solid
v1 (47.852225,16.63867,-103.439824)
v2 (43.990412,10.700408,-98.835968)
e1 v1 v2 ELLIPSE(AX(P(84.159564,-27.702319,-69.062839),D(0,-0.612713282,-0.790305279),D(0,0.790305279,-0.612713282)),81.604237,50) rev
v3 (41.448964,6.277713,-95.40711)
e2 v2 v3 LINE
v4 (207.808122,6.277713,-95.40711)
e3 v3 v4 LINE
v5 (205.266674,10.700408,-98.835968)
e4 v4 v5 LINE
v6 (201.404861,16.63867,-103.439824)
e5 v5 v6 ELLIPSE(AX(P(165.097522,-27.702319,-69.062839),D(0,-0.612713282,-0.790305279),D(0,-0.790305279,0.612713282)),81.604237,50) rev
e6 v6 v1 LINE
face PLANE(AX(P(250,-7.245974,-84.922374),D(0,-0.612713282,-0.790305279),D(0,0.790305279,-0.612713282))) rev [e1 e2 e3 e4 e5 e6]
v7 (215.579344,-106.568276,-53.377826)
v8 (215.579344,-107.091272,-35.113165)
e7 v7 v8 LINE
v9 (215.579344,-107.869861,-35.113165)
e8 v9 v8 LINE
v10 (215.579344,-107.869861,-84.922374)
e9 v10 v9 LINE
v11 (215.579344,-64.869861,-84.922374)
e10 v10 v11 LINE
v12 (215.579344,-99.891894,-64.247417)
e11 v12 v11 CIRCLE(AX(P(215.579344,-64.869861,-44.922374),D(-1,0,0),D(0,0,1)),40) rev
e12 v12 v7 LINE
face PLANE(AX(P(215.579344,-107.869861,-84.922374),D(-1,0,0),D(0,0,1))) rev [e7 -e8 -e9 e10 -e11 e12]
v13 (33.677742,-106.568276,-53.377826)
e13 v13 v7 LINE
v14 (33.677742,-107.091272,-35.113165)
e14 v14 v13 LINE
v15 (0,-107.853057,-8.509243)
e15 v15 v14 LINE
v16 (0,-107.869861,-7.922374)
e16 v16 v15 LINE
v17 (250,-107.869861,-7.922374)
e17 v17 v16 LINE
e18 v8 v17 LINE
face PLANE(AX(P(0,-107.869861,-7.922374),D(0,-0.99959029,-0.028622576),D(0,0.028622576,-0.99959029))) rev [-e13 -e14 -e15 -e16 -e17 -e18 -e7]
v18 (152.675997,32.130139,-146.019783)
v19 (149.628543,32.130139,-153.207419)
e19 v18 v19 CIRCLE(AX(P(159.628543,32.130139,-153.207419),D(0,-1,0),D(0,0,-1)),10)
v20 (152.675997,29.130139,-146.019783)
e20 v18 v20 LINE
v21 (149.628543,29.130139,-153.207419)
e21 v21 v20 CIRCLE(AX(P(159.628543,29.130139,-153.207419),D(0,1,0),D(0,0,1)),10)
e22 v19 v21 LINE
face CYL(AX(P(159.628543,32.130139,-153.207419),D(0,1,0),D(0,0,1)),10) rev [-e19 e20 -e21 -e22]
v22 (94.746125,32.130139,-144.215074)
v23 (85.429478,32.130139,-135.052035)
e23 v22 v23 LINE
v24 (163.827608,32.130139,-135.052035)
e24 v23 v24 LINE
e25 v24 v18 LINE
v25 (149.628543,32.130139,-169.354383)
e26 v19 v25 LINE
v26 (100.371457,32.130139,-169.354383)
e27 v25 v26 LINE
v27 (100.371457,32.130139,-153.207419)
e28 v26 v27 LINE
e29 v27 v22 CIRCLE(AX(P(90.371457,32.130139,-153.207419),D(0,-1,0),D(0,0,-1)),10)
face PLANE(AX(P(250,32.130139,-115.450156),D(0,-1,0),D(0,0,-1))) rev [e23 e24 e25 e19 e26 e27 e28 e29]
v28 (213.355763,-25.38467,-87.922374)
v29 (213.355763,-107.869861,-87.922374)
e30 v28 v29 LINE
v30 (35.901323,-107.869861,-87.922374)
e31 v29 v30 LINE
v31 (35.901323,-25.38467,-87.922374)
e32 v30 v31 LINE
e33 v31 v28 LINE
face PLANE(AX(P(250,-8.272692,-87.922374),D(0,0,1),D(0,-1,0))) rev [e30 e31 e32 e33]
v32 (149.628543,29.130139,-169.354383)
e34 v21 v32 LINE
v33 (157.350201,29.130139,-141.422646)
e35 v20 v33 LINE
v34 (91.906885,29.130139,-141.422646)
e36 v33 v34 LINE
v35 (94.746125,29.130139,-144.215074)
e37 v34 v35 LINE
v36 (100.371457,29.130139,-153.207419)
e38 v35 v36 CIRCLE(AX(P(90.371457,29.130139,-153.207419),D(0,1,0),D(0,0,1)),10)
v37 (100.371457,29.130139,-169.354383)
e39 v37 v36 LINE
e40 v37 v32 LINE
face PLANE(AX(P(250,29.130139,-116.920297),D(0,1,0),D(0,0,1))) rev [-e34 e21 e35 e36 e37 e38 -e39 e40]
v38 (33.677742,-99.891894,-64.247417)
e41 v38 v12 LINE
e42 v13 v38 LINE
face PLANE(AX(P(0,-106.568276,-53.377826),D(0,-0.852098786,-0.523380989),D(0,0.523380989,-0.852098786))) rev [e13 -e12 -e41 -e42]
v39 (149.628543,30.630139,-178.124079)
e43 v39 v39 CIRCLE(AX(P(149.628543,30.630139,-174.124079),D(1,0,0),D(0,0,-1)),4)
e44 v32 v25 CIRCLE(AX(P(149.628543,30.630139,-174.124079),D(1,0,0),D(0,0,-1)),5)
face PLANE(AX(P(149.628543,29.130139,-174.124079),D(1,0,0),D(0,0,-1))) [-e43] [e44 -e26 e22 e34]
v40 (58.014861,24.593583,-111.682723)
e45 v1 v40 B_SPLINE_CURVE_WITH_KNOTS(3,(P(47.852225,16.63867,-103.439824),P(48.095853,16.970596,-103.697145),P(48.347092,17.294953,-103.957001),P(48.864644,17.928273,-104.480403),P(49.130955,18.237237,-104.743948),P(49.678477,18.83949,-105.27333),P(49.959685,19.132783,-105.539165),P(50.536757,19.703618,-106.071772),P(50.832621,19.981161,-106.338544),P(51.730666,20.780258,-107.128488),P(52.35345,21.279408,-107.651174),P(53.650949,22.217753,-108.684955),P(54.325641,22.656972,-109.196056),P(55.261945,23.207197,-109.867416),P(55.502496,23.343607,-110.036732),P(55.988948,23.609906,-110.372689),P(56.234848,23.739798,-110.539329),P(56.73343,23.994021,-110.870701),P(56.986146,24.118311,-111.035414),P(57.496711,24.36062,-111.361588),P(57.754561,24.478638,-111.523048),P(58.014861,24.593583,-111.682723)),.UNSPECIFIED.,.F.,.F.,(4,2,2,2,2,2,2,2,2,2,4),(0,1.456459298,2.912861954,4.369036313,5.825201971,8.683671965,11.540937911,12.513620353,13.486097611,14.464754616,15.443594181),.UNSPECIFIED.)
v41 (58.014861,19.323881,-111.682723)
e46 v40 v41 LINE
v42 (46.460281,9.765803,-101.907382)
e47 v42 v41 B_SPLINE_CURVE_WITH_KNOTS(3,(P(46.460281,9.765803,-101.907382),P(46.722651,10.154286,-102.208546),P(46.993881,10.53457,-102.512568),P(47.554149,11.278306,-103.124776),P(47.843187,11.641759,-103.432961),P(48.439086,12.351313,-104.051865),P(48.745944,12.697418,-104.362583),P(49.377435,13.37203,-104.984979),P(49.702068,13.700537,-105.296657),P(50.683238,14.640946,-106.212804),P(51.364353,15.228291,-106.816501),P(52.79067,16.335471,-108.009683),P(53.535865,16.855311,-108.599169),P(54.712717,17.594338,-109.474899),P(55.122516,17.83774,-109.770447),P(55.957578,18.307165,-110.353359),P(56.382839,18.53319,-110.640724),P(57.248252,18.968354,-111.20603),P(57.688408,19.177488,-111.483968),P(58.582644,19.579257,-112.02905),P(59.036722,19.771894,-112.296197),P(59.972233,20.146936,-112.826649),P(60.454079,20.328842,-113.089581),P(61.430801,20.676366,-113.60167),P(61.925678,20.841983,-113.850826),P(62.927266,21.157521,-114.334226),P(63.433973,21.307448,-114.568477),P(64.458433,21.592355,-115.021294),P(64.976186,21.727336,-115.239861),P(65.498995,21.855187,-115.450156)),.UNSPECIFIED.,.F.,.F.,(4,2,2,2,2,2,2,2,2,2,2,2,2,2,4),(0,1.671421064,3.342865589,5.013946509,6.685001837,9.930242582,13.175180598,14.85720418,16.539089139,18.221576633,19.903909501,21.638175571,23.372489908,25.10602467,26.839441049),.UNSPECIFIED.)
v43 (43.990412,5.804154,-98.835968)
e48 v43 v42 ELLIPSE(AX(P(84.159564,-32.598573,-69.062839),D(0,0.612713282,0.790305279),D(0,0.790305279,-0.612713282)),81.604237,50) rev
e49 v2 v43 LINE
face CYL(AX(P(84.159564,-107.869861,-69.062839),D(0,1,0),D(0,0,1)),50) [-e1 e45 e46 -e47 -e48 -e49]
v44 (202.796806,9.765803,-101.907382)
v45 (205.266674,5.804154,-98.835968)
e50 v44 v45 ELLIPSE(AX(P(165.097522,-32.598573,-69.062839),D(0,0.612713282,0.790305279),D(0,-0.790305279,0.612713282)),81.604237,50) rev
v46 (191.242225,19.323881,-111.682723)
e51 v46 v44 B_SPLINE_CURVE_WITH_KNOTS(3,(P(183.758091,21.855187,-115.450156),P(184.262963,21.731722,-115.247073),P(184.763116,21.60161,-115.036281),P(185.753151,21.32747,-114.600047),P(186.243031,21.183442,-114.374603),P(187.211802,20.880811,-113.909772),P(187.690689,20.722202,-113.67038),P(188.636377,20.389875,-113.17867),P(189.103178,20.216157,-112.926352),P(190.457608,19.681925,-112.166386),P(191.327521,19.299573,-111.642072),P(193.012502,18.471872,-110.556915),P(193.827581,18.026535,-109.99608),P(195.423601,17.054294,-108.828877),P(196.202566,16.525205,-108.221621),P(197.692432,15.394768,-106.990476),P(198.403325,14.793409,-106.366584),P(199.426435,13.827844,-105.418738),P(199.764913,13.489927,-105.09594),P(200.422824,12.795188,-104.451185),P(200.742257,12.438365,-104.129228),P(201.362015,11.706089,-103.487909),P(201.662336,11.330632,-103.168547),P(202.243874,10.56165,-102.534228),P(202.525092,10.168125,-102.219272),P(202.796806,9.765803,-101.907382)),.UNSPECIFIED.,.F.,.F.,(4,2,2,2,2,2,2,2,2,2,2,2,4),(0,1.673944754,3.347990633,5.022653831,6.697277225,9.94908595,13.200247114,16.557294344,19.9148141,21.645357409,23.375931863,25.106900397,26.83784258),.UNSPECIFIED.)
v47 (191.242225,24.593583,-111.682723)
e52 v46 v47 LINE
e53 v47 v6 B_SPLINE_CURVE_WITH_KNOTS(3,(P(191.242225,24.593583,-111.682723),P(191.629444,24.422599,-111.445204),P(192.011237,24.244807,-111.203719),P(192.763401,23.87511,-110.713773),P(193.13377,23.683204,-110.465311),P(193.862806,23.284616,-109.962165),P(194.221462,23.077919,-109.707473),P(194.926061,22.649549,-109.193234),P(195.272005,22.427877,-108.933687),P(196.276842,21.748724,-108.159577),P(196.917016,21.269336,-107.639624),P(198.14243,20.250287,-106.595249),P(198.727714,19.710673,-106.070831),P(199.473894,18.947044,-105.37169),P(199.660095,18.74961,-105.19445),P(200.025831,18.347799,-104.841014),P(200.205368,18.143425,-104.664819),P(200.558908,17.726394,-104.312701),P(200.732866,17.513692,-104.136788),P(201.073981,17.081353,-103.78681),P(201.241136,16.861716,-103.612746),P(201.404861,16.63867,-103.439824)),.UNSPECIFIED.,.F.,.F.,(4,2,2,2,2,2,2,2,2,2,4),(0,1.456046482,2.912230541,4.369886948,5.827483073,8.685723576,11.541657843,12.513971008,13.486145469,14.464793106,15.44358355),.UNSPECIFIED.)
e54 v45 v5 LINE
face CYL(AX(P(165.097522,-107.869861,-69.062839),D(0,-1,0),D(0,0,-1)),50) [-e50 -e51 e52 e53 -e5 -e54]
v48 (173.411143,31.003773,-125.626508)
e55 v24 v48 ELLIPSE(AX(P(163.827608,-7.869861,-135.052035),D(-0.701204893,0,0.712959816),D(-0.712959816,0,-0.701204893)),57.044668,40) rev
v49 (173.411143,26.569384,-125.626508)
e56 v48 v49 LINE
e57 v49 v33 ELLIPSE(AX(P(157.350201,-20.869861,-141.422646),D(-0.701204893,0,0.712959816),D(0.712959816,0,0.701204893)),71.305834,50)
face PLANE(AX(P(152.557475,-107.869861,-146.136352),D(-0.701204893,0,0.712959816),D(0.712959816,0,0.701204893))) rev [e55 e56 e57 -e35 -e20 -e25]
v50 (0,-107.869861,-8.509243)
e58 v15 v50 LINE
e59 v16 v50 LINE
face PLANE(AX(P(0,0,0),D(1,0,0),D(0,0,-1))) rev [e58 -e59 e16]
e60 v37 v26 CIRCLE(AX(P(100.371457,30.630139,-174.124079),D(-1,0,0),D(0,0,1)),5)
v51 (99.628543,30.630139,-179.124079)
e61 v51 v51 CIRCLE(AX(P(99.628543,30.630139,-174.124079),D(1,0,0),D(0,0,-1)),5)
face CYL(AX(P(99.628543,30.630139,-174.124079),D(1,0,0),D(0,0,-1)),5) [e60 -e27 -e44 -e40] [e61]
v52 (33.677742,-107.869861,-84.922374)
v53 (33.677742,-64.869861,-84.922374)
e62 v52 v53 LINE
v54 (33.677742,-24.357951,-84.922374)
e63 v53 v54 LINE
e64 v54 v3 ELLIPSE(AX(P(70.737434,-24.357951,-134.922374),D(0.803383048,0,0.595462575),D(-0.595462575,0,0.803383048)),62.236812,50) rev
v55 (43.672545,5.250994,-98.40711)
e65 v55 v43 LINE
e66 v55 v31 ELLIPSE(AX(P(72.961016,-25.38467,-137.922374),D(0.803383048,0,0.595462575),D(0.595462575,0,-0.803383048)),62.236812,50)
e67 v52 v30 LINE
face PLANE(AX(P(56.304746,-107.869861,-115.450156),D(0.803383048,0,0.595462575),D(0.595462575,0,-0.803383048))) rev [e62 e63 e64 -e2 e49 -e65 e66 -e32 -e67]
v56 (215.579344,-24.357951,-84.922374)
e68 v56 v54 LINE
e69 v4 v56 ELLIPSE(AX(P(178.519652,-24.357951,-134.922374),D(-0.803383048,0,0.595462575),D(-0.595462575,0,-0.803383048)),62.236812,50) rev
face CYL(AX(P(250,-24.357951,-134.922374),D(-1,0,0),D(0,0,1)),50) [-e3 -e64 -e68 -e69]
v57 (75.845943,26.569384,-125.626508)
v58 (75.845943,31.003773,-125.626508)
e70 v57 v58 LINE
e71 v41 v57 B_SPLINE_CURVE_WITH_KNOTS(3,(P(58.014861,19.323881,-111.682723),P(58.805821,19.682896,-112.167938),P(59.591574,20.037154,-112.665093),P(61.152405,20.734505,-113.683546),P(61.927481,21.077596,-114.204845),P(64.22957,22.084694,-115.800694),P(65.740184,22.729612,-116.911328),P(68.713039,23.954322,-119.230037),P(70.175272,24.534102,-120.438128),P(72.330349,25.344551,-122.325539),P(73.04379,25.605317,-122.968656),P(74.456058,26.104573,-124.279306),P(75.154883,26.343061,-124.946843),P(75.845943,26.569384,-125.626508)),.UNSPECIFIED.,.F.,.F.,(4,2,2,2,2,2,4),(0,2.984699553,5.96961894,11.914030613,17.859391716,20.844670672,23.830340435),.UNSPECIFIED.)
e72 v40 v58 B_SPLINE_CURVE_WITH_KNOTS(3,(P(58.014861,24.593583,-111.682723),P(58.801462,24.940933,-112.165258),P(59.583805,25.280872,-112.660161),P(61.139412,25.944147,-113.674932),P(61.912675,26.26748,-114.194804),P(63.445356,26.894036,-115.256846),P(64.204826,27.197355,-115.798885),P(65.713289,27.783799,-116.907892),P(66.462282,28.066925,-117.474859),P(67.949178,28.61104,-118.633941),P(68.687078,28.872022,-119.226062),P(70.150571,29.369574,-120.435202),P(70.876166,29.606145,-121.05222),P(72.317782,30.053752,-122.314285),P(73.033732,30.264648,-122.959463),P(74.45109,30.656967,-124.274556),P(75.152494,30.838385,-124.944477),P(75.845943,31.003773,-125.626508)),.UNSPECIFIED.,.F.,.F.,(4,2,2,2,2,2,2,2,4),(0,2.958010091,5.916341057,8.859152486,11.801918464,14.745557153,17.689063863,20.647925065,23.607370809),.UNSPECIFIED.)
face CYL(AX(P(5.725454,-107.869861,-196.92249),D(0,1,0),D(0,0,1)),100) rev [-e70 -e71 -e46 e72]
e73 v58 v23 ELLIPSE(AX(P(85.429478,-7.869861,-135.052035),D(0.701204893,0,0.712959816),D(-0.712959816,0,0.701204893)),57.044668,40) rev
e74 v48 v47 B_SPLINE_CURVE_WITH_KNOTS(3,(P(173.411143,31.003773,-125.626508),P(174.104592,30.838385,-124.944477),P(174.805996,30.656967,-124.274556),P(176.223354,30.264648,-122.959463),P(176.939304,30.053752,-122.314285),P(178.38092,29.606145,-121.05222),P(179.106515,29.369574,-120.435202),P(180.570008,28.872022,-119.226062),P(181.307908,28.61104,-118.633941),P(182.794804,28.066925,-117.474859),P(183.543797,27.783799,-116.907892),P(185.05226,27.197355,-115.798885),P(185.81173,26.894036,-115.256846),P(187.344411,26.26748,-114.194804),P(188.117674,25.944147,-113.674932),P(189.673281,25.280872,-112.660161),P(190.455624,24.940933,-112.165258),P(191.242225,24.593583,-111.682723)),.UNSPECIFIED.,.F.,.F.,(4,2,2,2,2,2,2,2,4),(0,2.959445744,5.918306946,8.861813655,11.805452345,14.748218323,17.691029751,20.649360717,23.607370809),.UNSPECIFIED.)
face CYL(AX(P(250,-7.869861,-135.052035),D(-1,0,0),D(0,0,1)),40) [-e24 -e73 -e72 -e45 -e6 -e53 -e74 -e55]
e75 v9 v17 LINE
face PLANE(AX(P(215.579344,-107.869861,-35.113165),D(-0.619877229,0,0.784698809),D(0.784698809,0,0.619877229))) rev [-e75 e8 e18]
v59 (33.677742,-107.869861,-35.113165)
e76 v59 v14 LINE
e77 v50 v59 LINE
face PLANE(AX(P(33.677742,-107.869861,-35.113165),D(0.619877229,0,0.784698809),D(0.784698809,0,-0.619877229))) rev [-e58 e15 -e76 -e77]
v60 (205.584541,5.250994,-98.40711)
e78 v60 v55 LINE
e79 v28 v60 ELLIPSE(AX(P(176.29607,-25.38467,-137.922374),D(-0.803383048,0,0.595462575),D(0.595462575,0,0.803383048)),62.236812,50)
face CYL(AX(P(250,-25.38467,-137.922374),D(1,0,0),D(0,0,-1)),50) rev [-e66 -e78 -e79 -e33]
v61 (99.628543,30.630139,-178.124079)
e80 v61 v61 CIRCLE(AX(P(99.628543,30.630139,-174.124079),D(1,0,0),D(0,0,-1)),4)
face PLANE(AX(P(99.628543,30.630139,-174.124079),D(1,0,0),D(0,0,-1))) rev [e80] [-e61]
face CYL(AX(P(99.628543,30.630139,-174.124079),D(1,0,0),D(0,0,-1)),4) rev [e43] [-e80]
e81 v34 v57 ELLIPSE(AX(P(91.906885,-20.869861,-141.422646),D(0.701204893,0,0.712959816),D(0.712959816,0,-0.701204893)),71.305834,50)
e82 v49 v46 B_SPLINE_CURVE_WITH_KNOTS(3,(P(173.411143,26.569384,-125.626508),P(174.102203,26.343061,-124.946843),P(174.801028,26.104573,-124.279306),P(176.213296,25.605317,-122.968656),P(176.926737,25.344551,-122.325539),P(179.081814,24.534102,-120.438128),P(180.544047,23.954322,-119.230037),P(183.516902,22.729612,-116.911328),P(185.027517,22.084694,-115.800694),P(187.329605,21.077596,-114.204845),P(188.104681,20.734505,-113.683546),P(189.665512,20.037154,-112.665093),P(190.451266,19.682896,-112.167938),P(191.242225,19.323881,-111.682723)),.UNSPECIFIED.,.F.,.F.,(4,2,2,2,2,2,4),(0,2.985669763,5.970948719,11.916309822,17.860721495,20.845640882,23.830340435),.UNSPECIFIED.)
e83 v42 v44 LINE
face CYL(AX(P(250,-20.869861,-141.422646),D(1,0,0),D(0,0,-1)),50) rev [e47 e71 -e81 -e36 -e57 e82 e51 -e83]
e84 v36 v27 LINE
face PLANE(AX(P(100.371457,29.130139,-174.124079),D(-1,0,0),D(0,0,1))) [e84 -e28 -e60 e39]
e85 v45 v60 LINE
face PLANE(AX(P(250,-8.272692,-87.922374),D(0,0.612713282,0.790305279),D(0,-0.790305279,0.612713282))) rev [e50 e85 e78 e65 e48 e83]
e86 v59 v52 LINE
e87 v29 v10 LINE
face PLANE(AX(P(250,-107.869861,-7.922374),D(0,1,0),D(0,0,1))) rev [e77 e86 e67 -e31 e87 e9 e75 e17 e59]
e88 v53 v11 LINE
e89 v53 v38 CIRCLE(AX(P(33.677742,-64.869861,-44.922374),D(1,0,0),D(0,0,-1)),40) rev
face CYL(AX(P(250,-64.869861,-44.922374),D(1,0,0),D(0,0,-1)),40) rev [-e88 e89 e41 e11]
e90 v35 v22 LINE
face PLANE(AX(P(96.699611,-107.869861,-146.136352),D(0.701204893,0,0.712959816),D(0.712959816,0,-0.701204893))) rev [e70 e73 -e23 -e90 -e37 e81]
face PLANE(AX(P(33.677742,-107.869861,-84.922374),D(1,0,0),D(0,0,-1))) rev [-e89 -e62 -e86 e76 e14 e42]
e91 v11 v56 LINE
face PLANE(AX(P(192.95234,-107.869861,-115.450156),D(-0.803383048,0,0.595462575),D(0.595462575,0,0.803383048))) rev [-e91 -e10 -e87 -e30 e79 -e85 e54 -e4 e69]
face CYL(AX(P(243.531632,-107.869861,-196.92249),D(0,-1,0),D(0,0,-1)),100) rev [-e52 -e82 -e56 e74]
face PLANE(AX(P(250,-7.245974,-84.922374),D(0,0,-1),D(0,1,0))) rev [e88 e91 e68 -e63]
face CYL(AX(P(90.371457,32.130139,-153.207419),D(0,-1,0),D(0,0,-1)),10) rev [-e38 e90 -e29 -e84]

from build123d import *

# Parameters (mm, degrees)
BOSS_EXTRUDE1_DEPTH     = 250
FILLET1_R               = 40
SKETCH13_W              = 49.257086068
SKETCH13_H              = 61.833319097
BOSS_EXTRUDE5_DEPTH     = 3
SKETCH14_R              = 5
SKETCH14_R_2            = 4
BOSS_EXTRUDE6_DEPTH     = 50
SKETCH15_R              = 4
CUT_EXTRUDE5_DEPTH      = 50
FILLET5_R               = 10
CUT_EXTRUDE6_DEPTH      = 326.916158871
CUT_EXTRUDE6_DEPTH_BACK = 326.916158871
CUT_EXTRUDE7_DEPTH      = 301.326149824
CUT_EXTRUDE7_DEPTH_BACK = 301.326149824
FILLET6_R               = 50
FILLET7_R               = 50
FILLET8_R               = 50
FILLET9_R               = 50
FILLET10_R              = 50
FILLET11_R              = 100
FILLET12_START          = 43.99041169
FILLET12_DEPTH          = 161.276262689


with BuildPart() as part:
    # Sketch1 → Boss-Extrude1 (new body)
    with BuildSketch(Plane(origin=(0, 0, 0), x_dir=(0, 0, -1), z_dir=(1, 0, 0))):
        Polygon((84.922374429, -7.245973585), (84.922374429, -104.869861266), (7.922374429, -104.869861266), (7.922374429, -107.869861266), (87.922374429, -107.869861266), (87.922374429, -8.272692249), (116.920297026, 29.130138734), (143.207419357, 29.130138734), (143.207419357, 32.130138734), (115.450156075, 32.130138734), align=None)
    extrude(amount=BOSS_EXTRUDE1_DEPTH)

    # Fillet1
    fillet1_edges = [part.edges().sort_by_distance(p)[0] for p in [
        (125, -104.869861266, -84.922374429),
    ]]
    fillet(fillet1_edges, radius=FILLET1_R)

    # Sketch13 → Boss-Extrude5 (add)
    with BuildSketch(Plane(origin=(0, 32.130138734, 0), x_dir=(1, 0, 0), z_dir=(0, 1, 0))):
        with Locations((125, 143.207419358)):
            Rectangle(SKETCH13_W, SKETCH13_H)
    extrude(amount=-BOSS_EXTRUDE5_DEPTH)

    # Sketch14 → Boss-Extrude6 (add)
    with BuildSketch(Plane(origin=(149.628543034, 0, 0), x_dir=(0, 0, -1), z_dir=(1, 0, 0))):
        with Locations((174.124078906, 30.630138734)):
            Circle(SKETCH14_R)
        with Locations((174.124078906, 30.630138734)):
            Circle(SKETCH14_R_2, mode=Mode.SUBTRACT)
    extrude(amount=-BOSS_EXTRUDE6_DEPTH)

    # Sketch15 → Cut-Extrude5 (cut)
    with BuildSketch(Plane(origin=(149.628543034, 0, 0), x_dir=(0, 0, -1), z_dir=(1, 0, 0))):
        with Locations((174.124078906, 30.630138734)):
            Circle(SKETCH15_R)
    extrude(amount=-CUT_EXTRUDE5_DEPTH, mode=Mode.SUBTRACT)

    # Fillet5
    fillet5_edges = [part.edges().sort_by_distance(p)[0] for p in [
        (149.628543034, 30.630138734, -143.207419357),
        (100.371456966, 30.630138734, -143.207419357),
    ]]
    fillet(fillet5_edges, radius=FILLET5_R)

    # Sketch16 → Cut-Extrude6 (cut, two sides: drawn at the far end of the back side and taken through both)
    with BuildSketch(Plane(origin=(0, 0, 0), x_dir=(1, 0, 0), z_dir=(0, 1, 0)).offset(-CUT_EXTRUDE6_DEPTH_BACK)):
        Polygon((152.557475223, 146.136351545), (183.758090757, 115.450156075), (192.952340186, 115.450156075), (215.579344221, 84.922374429), (215.579344221, 35.113164703), (250, 7.922374429), (290.889121347, 148.865149358), (190.317133447, 171.001918434), align=None)
        Polygon((56.304745883, 115.450156075), (65.498995311, 115.450156075), (96.699610846, 146.136351545), (58.939952622, 171.001918434), (-41.632035279, 148.865149358), (-0.742913931, 7.922374429), (33.677741848, 35.113164703), (33.677741848, 84.922374429), align=None)
    extrude(amount=CUT_EXTRUDE6_DEPTH + CUT_EXTRUDE6_DEPTH_BACK, mode=Mode.SUBTRACT)

    # Sketch20 → Cut-Extrude7 (cut, two sides: drawn at the far end of the back side and taken through both)
    with BuildSketch(Plane(origin=(215.579344221, 0, 0), x_dir=(0, 0, -1), z_dir=(1, 0, 0)).offset(-CUT_EXTRUDE7_DEPTH_BACK)):
        Polygon((7.922374429, -107.869861266), (53.377825638, -106.568275865), (64.247416618, -99.891893537), (2.905628415, -97.28009186), (4.033474998, -102.693755458), align=None)
    extrude(amount=CUT_EXTRUDE7_DEPTH + CUT_EXTRUDE7_DEPTH_BACK, mode=Mode.SUBTRACT)

    # Fillet6
    fillet6_edges = [part.edges().sort_by_distance(p)[0] for p in [
        (124.628543034, -7.245973585, -84.922374429),
    ]]
    fillet(fillet6_edges, radius=FILLET6_R)

    # Fillet7
    fillet7_edges = [part.edges().sort_by_distance(p)[0] for p in [
        (124.628543034, -8.272692249, -87.922374429),
    ]]
    fillet(fillet7_edges, radius=FILLET7_R)

    # Fillet8
    fillet8_edges = [part.edges().sort_by_distance(p)[0] for p in [
        (124.628543034, 29.130138734, -116.920297026),
    ]]
    fillet(fillet8_edges, radius=FILLET8_R)

    # Fillet9
    # the kernel refuses this fillet: 50 mm, written as the material it takes off along each edge
    with BuildSketch(Plane(origin=(192.952340186, -29.84551843, -115.450156075), x_dir=(0.5954625750047567, 0, 0.8033830479719526), z_dir=(0, 1, 0))) as fillet9_piece_1:
        with BuildLine():
            CenterArc((20.680282204, -50), FILLET9_R, 90, 31.540576836)
            Line((-5.47483144, -7.38650413), (0, 0))
            Line((0, 0), (20.680282204, 0))
        make_face()
    extrude(amount=113.676362673, mode=Mode.SUBTRACT)

    # Fillet10
    # the kernel refuses this fillet: 50 mm, written as the material it takes off along each edge
    with BuildSketch(Plane(origin=(56.304745883, 83.830844243, -115.450156075), x_dir=(-0.5954625750047574, 0, 0.8033830479719519), z_dir=(0, -1, 0))) as fillet10_piece_1:
        with BuildLine():
            CenterArc((20.680282204, -50), FILLET10_R, 90, 31.540576836)
            Line((-5.47483144, -7.38650413), (0, 0))
            Line((0, 0), (20.680282204, 0))
        make_face()
    extrude(amount=113.676362673, mode=Mode.SUBTRACT)

    # Fillet11
    fillet11_edges = [part.edges().sort_by_distance(p)[0] for p in [
        (65.498995311, 26.992662907, -115.450156075),
        (183.758090757, 26.992662907, -115.450156075),
    ]]
    fillet(fillet11_edges, radius=FILLET11_R)

    # Fillet12: read off the stored shape, not the designer's step
    # Fillet12 outline → Fillet12 (cut)
    with BuildSketch(Plane.YZ.offset(FILLET12_START)):
        with BuildLine():
            Line((29.130138734, -113.124295559), (16.638670002, -103.439824252))
            ThreePointArc((16.638670002, -103.439824252), (28.049083949, -117.450064663), (32.130138734, -135.052035423))
            Line((32.130138734, -135.052035423), (32.130138734, -112.290759809))
            Line((32.130138734, -112.290759809), (29.130138734, -112.290759809))
            Line((29.130138734, -112.290759809), (29.130138734, -113.124295559))
        make_face()
    extrude(amount=FILLET12_DEPTH, mode=Mode.SUBTRACT)


solid = part.part
